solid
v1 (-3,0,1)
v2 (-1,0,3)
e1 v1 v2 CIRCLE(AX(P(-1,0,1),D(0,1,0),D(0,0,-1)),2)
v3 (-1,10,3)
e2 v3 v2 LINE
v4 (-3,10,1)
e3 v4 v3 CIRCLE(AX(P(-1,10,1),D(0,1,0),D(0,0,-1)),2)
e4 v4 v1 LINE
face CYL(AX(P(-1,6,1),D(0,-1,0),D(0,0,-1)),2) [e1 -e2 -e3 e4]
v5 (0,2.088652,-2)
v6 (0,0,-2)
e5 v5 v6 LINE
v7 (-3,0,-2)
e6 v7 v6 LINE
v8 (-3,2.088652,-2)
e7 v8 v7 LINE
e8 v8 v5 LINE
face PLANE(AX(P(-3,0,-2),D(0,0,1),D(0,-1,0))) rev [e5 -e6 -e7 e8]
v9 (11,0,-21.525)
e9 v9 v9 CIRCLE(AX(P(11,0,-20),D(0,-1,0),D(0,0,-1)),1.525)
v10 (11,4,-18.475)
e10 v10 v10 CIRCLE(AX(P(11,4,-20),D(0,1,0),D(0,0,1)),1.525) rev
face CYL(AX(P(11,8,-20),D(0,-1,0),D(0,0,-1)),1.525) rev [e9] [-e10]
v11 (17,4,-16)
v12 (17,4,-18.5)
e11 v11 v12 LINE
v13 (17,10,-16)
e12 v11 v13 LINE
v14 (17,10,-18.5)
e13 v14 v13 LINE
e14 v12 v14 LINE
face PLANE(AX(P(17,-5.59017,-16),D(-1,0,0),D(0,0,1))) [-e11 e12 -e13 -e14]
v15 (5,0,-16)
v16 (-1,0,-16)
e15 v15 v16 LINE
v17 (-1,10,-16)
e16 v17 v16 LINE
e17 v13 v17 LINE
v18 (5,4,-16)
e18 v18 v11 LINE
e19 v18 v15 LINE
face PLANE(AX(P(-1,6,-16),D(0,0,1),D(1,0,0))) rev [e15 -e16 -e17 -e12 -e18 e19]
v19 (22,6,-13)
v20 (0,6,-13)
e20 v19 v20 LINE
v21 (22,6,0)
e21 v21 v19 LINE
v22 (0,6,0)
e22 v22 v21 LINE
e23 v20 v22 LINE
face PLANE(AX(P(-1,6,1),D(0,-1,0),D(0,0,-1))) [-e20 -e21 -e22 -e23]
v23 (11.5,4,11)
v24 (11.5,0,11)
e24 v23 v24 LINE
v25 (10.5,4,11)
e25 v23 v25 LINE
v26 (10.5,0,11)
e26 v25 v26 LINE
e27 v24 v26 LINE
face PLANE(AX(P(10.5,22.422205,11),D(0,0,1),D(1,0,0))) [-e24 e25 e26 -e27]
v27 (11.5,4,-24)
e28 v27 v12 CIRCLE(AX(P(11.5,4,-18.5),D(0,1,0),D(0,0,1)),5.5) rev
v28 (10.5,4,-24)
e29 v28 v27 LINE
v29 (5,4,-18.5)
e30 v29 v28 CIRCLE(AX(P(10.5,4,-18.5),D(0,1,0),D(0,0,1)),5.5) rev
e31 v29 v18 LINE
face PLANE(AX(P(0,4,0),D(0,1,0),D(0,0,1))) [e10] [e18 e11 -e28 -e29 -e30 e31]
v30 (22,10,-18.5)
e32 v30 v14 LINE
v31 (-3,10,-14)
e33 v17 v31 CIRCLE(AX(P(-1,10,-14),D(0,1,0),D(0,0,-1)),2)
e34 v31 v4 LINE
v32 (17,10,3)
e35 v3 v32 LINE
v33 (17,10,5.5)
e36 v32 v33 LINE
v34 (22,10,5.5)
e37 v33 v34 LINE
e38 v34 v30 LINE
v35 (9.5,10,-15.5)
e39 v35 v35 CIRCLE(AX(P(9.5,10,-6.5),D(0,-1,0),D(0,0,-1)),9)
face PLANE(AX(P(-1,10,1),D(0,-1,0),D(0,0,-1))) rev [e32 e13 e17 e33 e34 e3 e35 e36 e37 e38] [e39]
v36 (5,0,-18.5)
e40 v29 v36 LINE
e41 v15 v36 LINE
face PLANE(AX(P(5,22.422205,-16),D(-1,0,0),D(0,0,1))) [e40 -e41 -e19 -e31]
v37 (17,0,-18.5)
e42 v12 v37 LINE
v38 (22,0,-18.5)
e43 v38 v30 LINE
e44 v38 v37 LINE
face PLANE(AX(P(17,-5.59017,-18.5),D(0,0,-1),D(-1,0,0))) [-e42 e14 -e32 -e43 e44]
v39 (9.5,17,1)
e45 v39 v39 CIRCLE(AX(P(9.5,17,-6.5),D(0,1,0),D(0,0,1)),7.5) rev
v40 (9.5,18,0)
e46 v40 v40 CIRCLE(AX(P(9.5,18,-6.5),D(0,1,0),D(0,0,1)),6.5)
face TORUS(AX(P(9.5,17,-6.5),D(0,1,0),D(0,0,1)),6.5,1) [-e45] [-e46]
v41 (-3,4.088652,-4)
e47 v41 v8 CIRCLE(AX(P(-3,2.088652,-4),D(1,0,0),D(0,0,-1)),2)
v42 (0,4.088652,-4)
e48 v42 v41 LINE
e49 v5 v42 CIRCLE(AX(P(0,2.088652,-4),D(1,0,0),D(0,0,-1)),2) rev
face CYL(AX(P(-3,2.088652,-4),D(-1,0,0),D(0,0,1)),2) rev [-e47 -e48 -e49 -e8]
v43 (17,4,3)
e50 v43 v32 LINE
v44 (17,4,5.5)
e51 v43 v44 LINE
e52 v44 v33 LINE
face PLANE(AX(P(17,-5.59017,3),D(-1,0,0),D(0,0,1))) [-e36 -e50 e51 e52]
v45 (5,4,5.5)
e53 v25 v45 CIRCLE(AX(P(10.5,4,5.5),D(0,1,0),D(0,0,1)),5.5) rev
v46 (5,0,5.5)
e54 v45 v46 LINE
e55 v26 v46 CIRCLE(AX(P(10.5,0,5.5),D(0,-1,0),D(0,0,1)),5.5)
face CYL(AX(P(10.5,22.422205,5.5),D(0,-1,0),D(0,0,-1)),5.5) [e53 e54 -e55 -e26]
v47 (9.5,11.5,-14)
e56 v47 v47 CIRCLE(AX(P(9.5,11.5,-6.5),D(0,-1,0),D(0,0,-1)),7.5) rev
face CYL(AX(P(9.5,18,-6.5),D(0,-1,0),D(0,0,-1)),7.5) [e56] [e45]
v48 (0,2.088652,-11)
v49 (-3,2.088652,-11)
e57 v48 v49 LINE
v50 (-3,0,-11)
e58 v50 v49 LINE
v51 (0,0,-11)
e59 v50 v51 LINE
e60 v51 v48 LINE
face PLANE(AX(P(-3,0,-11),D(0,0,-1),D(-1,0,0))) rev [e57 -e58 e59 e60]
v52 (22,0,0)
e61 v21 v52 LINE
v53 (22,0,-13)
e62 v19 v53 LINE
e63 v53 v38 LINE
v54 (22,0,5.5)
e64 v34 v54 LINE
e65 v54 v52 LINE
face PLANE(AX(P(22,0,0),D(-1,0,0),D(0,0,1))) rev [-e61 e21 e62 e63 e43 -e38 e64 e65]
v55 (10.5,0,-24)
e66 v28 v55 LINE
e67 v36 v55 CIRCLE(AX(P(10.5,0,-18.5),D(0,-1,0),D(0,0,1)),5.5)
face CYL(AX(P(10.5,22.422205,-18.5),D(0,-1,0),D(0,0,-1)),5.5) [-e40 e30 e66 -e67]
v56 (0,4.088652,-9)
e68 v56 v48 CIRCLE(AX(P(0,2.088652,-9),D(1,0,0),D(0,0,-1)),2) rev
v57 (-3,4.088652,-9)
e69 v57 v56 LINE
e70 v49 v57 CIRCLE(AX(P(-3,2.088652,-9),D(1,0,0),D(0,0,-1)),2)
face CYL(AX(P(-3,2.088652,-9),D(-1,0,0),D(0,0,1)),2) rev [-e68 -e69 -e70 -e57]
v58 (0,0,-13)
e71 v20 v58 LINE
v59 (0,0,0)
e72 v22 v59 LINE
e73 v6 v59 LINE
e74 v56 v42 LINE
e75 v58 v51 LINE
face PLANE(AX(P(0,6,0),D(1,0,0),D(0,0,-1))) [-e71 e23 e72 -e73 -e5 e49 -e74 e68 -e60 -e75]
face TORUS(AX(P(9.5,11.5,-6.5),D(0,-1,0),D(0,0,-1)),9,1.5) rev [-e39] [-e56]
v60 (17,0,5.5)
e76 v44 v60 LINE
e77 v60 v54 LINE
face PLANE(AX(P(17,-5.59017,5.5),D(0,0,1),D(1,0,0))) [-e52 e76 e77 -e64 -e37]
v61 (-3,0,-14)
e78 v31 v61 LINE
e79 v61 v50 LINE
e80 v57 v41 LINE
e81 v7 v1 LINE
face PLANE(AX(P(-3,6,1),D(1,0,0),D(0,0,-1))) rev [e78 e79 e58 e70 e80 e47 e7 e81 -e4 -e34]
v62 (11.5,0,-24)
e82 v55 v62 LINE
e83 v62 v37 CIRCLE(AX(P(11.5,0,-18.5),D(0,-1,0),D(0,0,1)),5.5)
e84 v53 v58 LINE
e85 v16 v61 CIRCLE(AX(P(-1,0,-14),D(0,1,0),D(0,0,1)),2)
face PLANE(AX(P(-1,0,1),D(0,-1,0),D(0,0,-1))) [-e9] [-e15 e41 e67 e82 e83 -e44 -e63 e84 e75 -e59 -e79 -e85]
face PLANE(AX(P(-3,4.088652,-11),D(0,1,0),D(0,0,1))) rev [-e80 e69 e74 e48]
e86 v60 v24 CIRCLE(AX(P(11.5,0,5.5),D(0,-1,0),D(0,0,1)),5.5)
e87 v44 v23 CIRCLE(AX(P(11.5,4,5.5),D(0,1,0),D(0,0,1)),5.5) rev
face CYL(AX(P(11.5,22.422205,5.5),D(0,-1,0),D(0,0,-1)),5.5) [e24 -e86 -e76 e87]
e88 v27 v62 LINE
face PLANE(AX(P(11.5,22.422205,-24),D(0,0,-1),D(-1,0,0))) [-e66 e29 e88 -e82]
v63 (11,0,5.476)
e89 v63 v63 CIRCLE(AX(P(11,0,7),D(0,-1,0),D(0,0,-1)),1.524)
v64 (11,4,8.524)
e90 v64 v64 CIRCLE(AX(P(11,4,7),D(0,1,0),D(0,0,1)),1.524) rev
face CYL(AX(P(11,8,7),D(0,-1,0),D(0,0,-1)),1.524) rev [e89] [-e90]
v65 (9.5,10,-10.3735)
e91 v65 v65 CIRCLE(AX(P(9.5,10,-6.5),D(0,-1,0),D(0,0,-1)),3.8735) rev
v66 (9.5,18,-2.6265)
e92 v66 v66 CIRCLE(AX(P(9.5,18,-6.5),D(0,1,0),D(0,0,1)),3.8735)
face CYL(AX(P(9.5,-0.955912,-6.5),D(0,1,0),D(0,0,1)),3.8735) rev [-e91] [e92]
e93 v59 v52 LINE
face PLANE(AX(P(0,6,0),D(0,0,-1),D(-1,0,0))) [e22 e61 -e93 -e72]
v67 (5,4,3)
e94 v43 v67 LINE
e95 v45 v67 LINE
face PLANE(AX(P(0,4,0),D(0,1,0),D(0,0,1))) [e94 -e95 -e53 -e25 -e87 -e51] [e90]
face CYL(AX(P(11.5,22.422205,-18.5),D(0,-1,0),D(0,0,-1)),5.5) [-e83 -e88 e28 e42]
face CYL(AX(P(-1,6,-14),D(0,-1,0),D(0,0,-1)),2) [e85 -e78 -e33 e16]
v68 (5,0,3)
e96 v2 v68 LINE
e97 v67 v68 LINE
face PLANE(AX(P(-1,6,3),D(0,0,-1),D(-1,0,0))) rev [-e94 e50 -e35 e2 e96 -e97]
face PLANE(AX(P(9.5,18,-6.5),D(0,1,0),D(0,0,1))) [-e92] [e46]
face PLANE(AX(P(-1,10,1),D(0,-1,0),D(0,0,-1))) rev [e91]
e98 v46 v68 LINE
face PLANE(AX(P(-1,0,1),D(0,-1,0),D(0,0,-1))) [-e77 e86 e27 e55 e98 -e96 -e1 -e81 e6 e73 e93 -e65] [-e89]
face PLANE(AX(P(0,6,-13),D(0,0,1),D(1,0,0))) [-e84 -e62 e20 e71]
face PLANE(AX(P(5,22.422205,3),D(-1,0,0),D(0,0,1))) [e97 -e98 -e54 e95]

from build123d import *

# Parameters (mm, degrees)
SKETCH1_W           = 22
SKETCH1_H           = 13
BOSS_EXTRUDE1_DEPTH = 6
BOSS_EXTRUDE2_DEPTH = 2
BOSS_EXTRUDE3_DEPTH = 8
SKETCH4_R           = 1.525
SKETCH4_R_2         = 1.524
CUT_EXTRUDE1_DEPTH  = 36.566838488
SKETCH5_W           = 9
SKETCH5_H           = 4.088652256
CUT_EXTRUDE2_DEPTH  = 38.735924528
FILLET1_R           = 2
SKETCH6_W           = 12
SKETCH6_H           = 13.009000019
SKETCH6_W_2         = 15.838286437
CUT_EXTRUDE3_DEPTH  = 4
SKETCH7_W           = 2.5
SKETCH7_H           = 8
BOSS_EXTRUDE5_DEPTH = 3
FILLET3_R           = 2.5
FILLET4_R           = 2.5
SKETCH9_W           = 24
SKETCH9_H           = 8
CUT_EXTRUDE5_DEPTH  = 3
BOSS_EXTRUDE6_REACH = 35.526
SKETCH10_W          = 5
SKETCH10_H          = 2.5
BOSS_EXTRUDE7_DEPTH = 2
SKETCH12_R          = 7.5
BOSS_EXTRUDE8_DEPTH = 8
SKETCH13_R          = 3.8735
CUT_EXTRUDE6_DEPTH  = 8
FILLET5_R           = 1.5
FILLET7_R           = 1


with BuildPart() as part:
    # Sketch1 → Boss-Extrude1 (new body)
    with BuildSketch(Plane(origin=(0, 0, 0), x_dir=(1, 0, 0), z_dir=(0, 1, 0))):
        with BuildLine():
            Line((-1, -3), (23, -3))
            Line((23, -3), (25, -3))
            Line((25, -3), (25, -1))
            Line((25, -1), (25, 14))
            Line((25, 14), (25, 16))
            Line((25, 16), (23, 16))
            Line((23, 16), (-1, 16))
            ThreePointArc((-1, 16), (-2.414213562, 15.414213562), (-3, 14))
            Line((-3, 14), (-3, -1))
            ThreePointArc((-3, -1), (-2.414213562, -2.414213562), (-1, -3))
        make_face()
        with Locations((11, 6.5)):
            Rectangle(SKETCH1_W, SKETCH1_H, mode=Mode.SUBTRACT)
    extrude(amount=BOSS_EXTRUDE1_DEPTH)

    # Sketch2 → Boss-Extrude2 (add)
    with BuildSketch(Plane(origin=(0, 6, 0), x_dir=(1, 0, 0), z_dir=(0, 1, 0))):
        with BuildLine():
            Line((25, 14), (25, -1))
            Line((25, -1), (25, -3))
            Line((25, -3), (23, -3))
            Line((23, -3), (-1, -3))
            ThreePointArc((-1, -3), (-2.414213562, -2.414213562), (-3, -1))
            Line((-3, -1), (-3, 14))
            ThreePointArc((-3, 14), (-2.414213562, 15.414213562), (-1, 16))
            Line((-1, 16), (23, 16))
            Line((23, 16), (25, 16))
            Line((25, 16), (25, 14))
        make_face()
    extrude(amount=BOSS_EXTRUDE2_DEPTH)

    # Sketch3 → Boss-Extrude3 (add)
    with BuildSketch(Plane.XZ):
        with BuildLine():
            Line((5, 3), (17, 3))
            Line((17, 3), (17, 5.5))
            ThreePointArc((17, 5.5), (15.389087297, 9.389087297), (11.5, 11))
            Line((11.5, 11), (10.5, 11))
            ThreePointArc((10.5, 11), (6.610912703, 9.389087297), (5, 5.5))
            Line((5, 5.5), (5, 3))
        make_face()
        with BuildLine():
            Line((17, -16), (5, -16))
            Line((5, -16), (5, -18.5))
            ThreePointArc((5, -18.5), (6.610912703, -22.389087297), (10.5, -24))
            Line((10.5, -24), (11.5, -24))
            ThreePointArc((11.5, -24), (15.389087297, -22.389087297), (17, -18.5))
            Line((17, -18.5), (17, -16))
        make_face()
    extrude(amount=-BOSS_EXTRUDE3_DEPTH)

    # Sketch4 → Cut-Extrude1 (cut, through all)
    with BuildSketch(Plane(origin=(0, 0, 0), x_dir=(-1, 0, 0), z_dir=(0, -1, 0))):
        with Locations(Location((-11, 20, 0), (0, 0, 90))):
            Circle(SKETCH4_R)
        with Locations(Location((-11, -7, 0), (0, 0, 90))):
            Circle(SKETCH4_R_2)
    extrude(amount=-CUT_EXTRUDE1_DEPTH, mode=Mode.SUBTRACT)

    # Sketch5 → Cut-Extrude2 (cut, through all)
    with BuildSketch(Plane(origin=(25, 0, 0), x_dir=(0, 0, -1), z_dir=(1, 0, 0))):
        with Locations((6.5, 2.044326128)):
            Rectangle(SKETCH5_W, SKETCH5_H)
    extrude(amount=-CUT_EXTRUDE2_DEPTH, mode=Mode.SUBTRACT)

    # Fillet1
    fillet1_edges = [part.edges().sort_by_distance(p)[0] for p in [
        (-1.5, 4.088652256, -11),
        (-1.5, 4.088652256, -2),
        (23.5, 4.088652256, -11),
        (23.5, 4.088652256, -2),
    ]]
    fillet(fillet1_edges, radius=FILLET1_R)

    # Sketch6 → Cut-Extrude3 (cut)
    with BuildSketch(Plane(origin=(0, 8, 0), x_dir=(1, 0, 0), z_dir=(0, 1, 0))):
        with Locations((11, 22.504500009)):
            Rectangle(SKETCH6_W, SKETCH6_H)
        with Locations((11.149066226, -9.50450001)):
            Rectangle(SKETCH6_W_2, SKETCH6_H)
    extrude(amount=-CUT_EXTRUDE3_DEPTH, mode=Mode.SUBTRACT)

    # Sketch7 → Boss-Extrude5 (add)
    with BuildSketch(Plane(origin=(25, 0, 0), x_dir=(0, 0, -1), z_dir=(1, 0, 0))):
        with Locations((17.25, 4)):
            Rectangle(SKETCH7_W, SKETCH7_H)
        with Locations((-4.25, 4)):
            Rectangle(SKETCH7_W, SKETCH7_H)
    extrude(amount=-BOSS_EXTRUDE5_DEPTH)

    # Fillet3
    fillet3_edges = [part.edges().sort_by_distance(p)[0] for p in [
        (22, 4, -16),
    ]]
    fillet(fillet3_edges, radius=FILLET3_R - 0.0001)  # a hair under: the kernel refuses the full size

    # Fillet4
    fillet4_edges = [part.edges().sort_by_distance(p)[0] for p in [
        (22, 4, 3),
    ]]
    fillet(fillet4_edges, radius=FILLET4_R - 0.0001)  # a hair under: the kernel refuses the full size

    # Sketch9 → Cut-Extrude5 (cut)
    with BuildSketch(Plane(origin=(25, 0, 0), x_dir=(0, 0, -1), z_dir=(1, 0, 0))):
        with Locations((6.5, 4)):
            Rectangle(SKETCH9_W, SKETCH9_H)
    extrude(amount=-CUT_EXTRUDE5_DEPTH, mode=Mode.SUBTRACT)

    # Boss-Extrude6: up to this face of the body (flat: up to its plane)
    boss_extrude6_end = Plane(part.part.faces().sort_by_distance((9.97036164, 0, 3.836684907))[0])
    # Sketch10 → Boss-Extrude6 (add, up to the picked face)
    with BuildSketch(Plane(origin=(0, 8, 0), x_dir=(1, 0, 0), z_dir=(0, 1, 0)), mode=Mode.PRIVATE) as boss_extrude6_sk1:
        with Locations((19.5, 17.25)):
            Rectangle(SKETCH10_W, SKETCH10_H)
    boss_extrude6_tool1 = split(extrude(boss_extrude6_sk1.sketch, amount=-BOSS_EXTRUDE6_REACH, mode=Mode.PRIVATE), bisect_by=boss_extrude6_end, keep=Keep.BOTH, mode=Mode.PRIVATE)
    # Sketch10 → Boss-Extrude6 (add, up to the picked face)
    with BuildSketch(Plane(origin=(0, 8, 0), x_dir=(1, 0, 0), z_dir=(0, 1, 0)), mode=Mode.PRIVATE) as boss_extrude6_sk2:
        with Locations((19.5, -4.25)):
            Rectangle(SKETCH10_W, SKETCH10_H)
    boss_extrude6_tool2 = split(extrude(boss_extrude6_sk2.sketch, amount=-BOSS_EXTRUDE6_REACH, mode=Mode.PRIVATE), bisect_by=boss_extrude6_end, keep=Keep.BOTH, mode=Mode.PRIVATE)
    add(boss_extrude6_tool1.solids().sort_by(Axis((19.5, 8, -17.25), (0, -1, 0)))[0])
    add(boss_extrude6_tool2.solids().sort_by(Axis((19.5, 8, 4.25), (0, -1, 0)))[0])

    # Sketch11 → Boss-Extrude7 (add)
    with BuildSketch(Plane(origin=(0, 8, 0), x_dir=(1, 0, 0), z_dir=(0, 1, 0))):
        with BuildLine():
            Line((17, -3), (-1, -3))
            ThreePointArc((-1, -3), (-2.414213562, -2.414213562), (-3, -1))
            Line((-3, -1), (-3, 14))
            ThreePointArc((-3, 14), (-2.414213562, 15.414213562), (-1, 16))
            Line((-1, 16), (17, 16))
            Line((17, 16), (17, 18.5))
            Line((17, 18.5), (22, 18.5))
            Line((22, 18.5), (22, -5.5))
            Line((22, -5.5), (17, -5.5))
            Line((17, -5.5), (17, -3))
        make_face()
    extrude(amount=BOSS_EXTRUDE7_DEPTH)

    # Sketch12 → Boss-Extrude8 (add)
    with BuildSketch(Plane(origin=(0, 10, 0), x_dir=(1, 0, 0), z_dir=(0, 1, 0))):
        with Locations(Location((9.5, 6.5, 0), (0, 0, 90))):
            Circle(SKETCH12_R)
    extrude(amount=BOSS_EXTRUDE8_DEPTH)

    # Sketch13 → Cut-Extrude6 (cut)
    with BuildSketch(Plane(origin=(0, 18, 0), x_dir=(1, 0, 0), z_dir=(0, 1, 0))):
        with Locations(Location((9.5, 6.5, 0), (0, 0, 270))):
            Circle(SKETCH13_R)
    extrude(amount=-CUT_EXTRUDE6_DEPTH, mode=Mode.SUBTRACT)

    # Fillet5
    fillet5_edges = [part.edges().sort_by_distance(p)[0] for p in [
        (9.5, 10, 1),
    ]]
    fillet(fillet5_edges, radius=FILLET5_R)

    # Fillet7
    fillet7_edges = [part.edges().sort_by_distance(p)[0] for p in [
        (9.5, 18, 1),
    ]]
    fillet(fillet7_edges, radius=FILLET7_R)


solid = part.part
